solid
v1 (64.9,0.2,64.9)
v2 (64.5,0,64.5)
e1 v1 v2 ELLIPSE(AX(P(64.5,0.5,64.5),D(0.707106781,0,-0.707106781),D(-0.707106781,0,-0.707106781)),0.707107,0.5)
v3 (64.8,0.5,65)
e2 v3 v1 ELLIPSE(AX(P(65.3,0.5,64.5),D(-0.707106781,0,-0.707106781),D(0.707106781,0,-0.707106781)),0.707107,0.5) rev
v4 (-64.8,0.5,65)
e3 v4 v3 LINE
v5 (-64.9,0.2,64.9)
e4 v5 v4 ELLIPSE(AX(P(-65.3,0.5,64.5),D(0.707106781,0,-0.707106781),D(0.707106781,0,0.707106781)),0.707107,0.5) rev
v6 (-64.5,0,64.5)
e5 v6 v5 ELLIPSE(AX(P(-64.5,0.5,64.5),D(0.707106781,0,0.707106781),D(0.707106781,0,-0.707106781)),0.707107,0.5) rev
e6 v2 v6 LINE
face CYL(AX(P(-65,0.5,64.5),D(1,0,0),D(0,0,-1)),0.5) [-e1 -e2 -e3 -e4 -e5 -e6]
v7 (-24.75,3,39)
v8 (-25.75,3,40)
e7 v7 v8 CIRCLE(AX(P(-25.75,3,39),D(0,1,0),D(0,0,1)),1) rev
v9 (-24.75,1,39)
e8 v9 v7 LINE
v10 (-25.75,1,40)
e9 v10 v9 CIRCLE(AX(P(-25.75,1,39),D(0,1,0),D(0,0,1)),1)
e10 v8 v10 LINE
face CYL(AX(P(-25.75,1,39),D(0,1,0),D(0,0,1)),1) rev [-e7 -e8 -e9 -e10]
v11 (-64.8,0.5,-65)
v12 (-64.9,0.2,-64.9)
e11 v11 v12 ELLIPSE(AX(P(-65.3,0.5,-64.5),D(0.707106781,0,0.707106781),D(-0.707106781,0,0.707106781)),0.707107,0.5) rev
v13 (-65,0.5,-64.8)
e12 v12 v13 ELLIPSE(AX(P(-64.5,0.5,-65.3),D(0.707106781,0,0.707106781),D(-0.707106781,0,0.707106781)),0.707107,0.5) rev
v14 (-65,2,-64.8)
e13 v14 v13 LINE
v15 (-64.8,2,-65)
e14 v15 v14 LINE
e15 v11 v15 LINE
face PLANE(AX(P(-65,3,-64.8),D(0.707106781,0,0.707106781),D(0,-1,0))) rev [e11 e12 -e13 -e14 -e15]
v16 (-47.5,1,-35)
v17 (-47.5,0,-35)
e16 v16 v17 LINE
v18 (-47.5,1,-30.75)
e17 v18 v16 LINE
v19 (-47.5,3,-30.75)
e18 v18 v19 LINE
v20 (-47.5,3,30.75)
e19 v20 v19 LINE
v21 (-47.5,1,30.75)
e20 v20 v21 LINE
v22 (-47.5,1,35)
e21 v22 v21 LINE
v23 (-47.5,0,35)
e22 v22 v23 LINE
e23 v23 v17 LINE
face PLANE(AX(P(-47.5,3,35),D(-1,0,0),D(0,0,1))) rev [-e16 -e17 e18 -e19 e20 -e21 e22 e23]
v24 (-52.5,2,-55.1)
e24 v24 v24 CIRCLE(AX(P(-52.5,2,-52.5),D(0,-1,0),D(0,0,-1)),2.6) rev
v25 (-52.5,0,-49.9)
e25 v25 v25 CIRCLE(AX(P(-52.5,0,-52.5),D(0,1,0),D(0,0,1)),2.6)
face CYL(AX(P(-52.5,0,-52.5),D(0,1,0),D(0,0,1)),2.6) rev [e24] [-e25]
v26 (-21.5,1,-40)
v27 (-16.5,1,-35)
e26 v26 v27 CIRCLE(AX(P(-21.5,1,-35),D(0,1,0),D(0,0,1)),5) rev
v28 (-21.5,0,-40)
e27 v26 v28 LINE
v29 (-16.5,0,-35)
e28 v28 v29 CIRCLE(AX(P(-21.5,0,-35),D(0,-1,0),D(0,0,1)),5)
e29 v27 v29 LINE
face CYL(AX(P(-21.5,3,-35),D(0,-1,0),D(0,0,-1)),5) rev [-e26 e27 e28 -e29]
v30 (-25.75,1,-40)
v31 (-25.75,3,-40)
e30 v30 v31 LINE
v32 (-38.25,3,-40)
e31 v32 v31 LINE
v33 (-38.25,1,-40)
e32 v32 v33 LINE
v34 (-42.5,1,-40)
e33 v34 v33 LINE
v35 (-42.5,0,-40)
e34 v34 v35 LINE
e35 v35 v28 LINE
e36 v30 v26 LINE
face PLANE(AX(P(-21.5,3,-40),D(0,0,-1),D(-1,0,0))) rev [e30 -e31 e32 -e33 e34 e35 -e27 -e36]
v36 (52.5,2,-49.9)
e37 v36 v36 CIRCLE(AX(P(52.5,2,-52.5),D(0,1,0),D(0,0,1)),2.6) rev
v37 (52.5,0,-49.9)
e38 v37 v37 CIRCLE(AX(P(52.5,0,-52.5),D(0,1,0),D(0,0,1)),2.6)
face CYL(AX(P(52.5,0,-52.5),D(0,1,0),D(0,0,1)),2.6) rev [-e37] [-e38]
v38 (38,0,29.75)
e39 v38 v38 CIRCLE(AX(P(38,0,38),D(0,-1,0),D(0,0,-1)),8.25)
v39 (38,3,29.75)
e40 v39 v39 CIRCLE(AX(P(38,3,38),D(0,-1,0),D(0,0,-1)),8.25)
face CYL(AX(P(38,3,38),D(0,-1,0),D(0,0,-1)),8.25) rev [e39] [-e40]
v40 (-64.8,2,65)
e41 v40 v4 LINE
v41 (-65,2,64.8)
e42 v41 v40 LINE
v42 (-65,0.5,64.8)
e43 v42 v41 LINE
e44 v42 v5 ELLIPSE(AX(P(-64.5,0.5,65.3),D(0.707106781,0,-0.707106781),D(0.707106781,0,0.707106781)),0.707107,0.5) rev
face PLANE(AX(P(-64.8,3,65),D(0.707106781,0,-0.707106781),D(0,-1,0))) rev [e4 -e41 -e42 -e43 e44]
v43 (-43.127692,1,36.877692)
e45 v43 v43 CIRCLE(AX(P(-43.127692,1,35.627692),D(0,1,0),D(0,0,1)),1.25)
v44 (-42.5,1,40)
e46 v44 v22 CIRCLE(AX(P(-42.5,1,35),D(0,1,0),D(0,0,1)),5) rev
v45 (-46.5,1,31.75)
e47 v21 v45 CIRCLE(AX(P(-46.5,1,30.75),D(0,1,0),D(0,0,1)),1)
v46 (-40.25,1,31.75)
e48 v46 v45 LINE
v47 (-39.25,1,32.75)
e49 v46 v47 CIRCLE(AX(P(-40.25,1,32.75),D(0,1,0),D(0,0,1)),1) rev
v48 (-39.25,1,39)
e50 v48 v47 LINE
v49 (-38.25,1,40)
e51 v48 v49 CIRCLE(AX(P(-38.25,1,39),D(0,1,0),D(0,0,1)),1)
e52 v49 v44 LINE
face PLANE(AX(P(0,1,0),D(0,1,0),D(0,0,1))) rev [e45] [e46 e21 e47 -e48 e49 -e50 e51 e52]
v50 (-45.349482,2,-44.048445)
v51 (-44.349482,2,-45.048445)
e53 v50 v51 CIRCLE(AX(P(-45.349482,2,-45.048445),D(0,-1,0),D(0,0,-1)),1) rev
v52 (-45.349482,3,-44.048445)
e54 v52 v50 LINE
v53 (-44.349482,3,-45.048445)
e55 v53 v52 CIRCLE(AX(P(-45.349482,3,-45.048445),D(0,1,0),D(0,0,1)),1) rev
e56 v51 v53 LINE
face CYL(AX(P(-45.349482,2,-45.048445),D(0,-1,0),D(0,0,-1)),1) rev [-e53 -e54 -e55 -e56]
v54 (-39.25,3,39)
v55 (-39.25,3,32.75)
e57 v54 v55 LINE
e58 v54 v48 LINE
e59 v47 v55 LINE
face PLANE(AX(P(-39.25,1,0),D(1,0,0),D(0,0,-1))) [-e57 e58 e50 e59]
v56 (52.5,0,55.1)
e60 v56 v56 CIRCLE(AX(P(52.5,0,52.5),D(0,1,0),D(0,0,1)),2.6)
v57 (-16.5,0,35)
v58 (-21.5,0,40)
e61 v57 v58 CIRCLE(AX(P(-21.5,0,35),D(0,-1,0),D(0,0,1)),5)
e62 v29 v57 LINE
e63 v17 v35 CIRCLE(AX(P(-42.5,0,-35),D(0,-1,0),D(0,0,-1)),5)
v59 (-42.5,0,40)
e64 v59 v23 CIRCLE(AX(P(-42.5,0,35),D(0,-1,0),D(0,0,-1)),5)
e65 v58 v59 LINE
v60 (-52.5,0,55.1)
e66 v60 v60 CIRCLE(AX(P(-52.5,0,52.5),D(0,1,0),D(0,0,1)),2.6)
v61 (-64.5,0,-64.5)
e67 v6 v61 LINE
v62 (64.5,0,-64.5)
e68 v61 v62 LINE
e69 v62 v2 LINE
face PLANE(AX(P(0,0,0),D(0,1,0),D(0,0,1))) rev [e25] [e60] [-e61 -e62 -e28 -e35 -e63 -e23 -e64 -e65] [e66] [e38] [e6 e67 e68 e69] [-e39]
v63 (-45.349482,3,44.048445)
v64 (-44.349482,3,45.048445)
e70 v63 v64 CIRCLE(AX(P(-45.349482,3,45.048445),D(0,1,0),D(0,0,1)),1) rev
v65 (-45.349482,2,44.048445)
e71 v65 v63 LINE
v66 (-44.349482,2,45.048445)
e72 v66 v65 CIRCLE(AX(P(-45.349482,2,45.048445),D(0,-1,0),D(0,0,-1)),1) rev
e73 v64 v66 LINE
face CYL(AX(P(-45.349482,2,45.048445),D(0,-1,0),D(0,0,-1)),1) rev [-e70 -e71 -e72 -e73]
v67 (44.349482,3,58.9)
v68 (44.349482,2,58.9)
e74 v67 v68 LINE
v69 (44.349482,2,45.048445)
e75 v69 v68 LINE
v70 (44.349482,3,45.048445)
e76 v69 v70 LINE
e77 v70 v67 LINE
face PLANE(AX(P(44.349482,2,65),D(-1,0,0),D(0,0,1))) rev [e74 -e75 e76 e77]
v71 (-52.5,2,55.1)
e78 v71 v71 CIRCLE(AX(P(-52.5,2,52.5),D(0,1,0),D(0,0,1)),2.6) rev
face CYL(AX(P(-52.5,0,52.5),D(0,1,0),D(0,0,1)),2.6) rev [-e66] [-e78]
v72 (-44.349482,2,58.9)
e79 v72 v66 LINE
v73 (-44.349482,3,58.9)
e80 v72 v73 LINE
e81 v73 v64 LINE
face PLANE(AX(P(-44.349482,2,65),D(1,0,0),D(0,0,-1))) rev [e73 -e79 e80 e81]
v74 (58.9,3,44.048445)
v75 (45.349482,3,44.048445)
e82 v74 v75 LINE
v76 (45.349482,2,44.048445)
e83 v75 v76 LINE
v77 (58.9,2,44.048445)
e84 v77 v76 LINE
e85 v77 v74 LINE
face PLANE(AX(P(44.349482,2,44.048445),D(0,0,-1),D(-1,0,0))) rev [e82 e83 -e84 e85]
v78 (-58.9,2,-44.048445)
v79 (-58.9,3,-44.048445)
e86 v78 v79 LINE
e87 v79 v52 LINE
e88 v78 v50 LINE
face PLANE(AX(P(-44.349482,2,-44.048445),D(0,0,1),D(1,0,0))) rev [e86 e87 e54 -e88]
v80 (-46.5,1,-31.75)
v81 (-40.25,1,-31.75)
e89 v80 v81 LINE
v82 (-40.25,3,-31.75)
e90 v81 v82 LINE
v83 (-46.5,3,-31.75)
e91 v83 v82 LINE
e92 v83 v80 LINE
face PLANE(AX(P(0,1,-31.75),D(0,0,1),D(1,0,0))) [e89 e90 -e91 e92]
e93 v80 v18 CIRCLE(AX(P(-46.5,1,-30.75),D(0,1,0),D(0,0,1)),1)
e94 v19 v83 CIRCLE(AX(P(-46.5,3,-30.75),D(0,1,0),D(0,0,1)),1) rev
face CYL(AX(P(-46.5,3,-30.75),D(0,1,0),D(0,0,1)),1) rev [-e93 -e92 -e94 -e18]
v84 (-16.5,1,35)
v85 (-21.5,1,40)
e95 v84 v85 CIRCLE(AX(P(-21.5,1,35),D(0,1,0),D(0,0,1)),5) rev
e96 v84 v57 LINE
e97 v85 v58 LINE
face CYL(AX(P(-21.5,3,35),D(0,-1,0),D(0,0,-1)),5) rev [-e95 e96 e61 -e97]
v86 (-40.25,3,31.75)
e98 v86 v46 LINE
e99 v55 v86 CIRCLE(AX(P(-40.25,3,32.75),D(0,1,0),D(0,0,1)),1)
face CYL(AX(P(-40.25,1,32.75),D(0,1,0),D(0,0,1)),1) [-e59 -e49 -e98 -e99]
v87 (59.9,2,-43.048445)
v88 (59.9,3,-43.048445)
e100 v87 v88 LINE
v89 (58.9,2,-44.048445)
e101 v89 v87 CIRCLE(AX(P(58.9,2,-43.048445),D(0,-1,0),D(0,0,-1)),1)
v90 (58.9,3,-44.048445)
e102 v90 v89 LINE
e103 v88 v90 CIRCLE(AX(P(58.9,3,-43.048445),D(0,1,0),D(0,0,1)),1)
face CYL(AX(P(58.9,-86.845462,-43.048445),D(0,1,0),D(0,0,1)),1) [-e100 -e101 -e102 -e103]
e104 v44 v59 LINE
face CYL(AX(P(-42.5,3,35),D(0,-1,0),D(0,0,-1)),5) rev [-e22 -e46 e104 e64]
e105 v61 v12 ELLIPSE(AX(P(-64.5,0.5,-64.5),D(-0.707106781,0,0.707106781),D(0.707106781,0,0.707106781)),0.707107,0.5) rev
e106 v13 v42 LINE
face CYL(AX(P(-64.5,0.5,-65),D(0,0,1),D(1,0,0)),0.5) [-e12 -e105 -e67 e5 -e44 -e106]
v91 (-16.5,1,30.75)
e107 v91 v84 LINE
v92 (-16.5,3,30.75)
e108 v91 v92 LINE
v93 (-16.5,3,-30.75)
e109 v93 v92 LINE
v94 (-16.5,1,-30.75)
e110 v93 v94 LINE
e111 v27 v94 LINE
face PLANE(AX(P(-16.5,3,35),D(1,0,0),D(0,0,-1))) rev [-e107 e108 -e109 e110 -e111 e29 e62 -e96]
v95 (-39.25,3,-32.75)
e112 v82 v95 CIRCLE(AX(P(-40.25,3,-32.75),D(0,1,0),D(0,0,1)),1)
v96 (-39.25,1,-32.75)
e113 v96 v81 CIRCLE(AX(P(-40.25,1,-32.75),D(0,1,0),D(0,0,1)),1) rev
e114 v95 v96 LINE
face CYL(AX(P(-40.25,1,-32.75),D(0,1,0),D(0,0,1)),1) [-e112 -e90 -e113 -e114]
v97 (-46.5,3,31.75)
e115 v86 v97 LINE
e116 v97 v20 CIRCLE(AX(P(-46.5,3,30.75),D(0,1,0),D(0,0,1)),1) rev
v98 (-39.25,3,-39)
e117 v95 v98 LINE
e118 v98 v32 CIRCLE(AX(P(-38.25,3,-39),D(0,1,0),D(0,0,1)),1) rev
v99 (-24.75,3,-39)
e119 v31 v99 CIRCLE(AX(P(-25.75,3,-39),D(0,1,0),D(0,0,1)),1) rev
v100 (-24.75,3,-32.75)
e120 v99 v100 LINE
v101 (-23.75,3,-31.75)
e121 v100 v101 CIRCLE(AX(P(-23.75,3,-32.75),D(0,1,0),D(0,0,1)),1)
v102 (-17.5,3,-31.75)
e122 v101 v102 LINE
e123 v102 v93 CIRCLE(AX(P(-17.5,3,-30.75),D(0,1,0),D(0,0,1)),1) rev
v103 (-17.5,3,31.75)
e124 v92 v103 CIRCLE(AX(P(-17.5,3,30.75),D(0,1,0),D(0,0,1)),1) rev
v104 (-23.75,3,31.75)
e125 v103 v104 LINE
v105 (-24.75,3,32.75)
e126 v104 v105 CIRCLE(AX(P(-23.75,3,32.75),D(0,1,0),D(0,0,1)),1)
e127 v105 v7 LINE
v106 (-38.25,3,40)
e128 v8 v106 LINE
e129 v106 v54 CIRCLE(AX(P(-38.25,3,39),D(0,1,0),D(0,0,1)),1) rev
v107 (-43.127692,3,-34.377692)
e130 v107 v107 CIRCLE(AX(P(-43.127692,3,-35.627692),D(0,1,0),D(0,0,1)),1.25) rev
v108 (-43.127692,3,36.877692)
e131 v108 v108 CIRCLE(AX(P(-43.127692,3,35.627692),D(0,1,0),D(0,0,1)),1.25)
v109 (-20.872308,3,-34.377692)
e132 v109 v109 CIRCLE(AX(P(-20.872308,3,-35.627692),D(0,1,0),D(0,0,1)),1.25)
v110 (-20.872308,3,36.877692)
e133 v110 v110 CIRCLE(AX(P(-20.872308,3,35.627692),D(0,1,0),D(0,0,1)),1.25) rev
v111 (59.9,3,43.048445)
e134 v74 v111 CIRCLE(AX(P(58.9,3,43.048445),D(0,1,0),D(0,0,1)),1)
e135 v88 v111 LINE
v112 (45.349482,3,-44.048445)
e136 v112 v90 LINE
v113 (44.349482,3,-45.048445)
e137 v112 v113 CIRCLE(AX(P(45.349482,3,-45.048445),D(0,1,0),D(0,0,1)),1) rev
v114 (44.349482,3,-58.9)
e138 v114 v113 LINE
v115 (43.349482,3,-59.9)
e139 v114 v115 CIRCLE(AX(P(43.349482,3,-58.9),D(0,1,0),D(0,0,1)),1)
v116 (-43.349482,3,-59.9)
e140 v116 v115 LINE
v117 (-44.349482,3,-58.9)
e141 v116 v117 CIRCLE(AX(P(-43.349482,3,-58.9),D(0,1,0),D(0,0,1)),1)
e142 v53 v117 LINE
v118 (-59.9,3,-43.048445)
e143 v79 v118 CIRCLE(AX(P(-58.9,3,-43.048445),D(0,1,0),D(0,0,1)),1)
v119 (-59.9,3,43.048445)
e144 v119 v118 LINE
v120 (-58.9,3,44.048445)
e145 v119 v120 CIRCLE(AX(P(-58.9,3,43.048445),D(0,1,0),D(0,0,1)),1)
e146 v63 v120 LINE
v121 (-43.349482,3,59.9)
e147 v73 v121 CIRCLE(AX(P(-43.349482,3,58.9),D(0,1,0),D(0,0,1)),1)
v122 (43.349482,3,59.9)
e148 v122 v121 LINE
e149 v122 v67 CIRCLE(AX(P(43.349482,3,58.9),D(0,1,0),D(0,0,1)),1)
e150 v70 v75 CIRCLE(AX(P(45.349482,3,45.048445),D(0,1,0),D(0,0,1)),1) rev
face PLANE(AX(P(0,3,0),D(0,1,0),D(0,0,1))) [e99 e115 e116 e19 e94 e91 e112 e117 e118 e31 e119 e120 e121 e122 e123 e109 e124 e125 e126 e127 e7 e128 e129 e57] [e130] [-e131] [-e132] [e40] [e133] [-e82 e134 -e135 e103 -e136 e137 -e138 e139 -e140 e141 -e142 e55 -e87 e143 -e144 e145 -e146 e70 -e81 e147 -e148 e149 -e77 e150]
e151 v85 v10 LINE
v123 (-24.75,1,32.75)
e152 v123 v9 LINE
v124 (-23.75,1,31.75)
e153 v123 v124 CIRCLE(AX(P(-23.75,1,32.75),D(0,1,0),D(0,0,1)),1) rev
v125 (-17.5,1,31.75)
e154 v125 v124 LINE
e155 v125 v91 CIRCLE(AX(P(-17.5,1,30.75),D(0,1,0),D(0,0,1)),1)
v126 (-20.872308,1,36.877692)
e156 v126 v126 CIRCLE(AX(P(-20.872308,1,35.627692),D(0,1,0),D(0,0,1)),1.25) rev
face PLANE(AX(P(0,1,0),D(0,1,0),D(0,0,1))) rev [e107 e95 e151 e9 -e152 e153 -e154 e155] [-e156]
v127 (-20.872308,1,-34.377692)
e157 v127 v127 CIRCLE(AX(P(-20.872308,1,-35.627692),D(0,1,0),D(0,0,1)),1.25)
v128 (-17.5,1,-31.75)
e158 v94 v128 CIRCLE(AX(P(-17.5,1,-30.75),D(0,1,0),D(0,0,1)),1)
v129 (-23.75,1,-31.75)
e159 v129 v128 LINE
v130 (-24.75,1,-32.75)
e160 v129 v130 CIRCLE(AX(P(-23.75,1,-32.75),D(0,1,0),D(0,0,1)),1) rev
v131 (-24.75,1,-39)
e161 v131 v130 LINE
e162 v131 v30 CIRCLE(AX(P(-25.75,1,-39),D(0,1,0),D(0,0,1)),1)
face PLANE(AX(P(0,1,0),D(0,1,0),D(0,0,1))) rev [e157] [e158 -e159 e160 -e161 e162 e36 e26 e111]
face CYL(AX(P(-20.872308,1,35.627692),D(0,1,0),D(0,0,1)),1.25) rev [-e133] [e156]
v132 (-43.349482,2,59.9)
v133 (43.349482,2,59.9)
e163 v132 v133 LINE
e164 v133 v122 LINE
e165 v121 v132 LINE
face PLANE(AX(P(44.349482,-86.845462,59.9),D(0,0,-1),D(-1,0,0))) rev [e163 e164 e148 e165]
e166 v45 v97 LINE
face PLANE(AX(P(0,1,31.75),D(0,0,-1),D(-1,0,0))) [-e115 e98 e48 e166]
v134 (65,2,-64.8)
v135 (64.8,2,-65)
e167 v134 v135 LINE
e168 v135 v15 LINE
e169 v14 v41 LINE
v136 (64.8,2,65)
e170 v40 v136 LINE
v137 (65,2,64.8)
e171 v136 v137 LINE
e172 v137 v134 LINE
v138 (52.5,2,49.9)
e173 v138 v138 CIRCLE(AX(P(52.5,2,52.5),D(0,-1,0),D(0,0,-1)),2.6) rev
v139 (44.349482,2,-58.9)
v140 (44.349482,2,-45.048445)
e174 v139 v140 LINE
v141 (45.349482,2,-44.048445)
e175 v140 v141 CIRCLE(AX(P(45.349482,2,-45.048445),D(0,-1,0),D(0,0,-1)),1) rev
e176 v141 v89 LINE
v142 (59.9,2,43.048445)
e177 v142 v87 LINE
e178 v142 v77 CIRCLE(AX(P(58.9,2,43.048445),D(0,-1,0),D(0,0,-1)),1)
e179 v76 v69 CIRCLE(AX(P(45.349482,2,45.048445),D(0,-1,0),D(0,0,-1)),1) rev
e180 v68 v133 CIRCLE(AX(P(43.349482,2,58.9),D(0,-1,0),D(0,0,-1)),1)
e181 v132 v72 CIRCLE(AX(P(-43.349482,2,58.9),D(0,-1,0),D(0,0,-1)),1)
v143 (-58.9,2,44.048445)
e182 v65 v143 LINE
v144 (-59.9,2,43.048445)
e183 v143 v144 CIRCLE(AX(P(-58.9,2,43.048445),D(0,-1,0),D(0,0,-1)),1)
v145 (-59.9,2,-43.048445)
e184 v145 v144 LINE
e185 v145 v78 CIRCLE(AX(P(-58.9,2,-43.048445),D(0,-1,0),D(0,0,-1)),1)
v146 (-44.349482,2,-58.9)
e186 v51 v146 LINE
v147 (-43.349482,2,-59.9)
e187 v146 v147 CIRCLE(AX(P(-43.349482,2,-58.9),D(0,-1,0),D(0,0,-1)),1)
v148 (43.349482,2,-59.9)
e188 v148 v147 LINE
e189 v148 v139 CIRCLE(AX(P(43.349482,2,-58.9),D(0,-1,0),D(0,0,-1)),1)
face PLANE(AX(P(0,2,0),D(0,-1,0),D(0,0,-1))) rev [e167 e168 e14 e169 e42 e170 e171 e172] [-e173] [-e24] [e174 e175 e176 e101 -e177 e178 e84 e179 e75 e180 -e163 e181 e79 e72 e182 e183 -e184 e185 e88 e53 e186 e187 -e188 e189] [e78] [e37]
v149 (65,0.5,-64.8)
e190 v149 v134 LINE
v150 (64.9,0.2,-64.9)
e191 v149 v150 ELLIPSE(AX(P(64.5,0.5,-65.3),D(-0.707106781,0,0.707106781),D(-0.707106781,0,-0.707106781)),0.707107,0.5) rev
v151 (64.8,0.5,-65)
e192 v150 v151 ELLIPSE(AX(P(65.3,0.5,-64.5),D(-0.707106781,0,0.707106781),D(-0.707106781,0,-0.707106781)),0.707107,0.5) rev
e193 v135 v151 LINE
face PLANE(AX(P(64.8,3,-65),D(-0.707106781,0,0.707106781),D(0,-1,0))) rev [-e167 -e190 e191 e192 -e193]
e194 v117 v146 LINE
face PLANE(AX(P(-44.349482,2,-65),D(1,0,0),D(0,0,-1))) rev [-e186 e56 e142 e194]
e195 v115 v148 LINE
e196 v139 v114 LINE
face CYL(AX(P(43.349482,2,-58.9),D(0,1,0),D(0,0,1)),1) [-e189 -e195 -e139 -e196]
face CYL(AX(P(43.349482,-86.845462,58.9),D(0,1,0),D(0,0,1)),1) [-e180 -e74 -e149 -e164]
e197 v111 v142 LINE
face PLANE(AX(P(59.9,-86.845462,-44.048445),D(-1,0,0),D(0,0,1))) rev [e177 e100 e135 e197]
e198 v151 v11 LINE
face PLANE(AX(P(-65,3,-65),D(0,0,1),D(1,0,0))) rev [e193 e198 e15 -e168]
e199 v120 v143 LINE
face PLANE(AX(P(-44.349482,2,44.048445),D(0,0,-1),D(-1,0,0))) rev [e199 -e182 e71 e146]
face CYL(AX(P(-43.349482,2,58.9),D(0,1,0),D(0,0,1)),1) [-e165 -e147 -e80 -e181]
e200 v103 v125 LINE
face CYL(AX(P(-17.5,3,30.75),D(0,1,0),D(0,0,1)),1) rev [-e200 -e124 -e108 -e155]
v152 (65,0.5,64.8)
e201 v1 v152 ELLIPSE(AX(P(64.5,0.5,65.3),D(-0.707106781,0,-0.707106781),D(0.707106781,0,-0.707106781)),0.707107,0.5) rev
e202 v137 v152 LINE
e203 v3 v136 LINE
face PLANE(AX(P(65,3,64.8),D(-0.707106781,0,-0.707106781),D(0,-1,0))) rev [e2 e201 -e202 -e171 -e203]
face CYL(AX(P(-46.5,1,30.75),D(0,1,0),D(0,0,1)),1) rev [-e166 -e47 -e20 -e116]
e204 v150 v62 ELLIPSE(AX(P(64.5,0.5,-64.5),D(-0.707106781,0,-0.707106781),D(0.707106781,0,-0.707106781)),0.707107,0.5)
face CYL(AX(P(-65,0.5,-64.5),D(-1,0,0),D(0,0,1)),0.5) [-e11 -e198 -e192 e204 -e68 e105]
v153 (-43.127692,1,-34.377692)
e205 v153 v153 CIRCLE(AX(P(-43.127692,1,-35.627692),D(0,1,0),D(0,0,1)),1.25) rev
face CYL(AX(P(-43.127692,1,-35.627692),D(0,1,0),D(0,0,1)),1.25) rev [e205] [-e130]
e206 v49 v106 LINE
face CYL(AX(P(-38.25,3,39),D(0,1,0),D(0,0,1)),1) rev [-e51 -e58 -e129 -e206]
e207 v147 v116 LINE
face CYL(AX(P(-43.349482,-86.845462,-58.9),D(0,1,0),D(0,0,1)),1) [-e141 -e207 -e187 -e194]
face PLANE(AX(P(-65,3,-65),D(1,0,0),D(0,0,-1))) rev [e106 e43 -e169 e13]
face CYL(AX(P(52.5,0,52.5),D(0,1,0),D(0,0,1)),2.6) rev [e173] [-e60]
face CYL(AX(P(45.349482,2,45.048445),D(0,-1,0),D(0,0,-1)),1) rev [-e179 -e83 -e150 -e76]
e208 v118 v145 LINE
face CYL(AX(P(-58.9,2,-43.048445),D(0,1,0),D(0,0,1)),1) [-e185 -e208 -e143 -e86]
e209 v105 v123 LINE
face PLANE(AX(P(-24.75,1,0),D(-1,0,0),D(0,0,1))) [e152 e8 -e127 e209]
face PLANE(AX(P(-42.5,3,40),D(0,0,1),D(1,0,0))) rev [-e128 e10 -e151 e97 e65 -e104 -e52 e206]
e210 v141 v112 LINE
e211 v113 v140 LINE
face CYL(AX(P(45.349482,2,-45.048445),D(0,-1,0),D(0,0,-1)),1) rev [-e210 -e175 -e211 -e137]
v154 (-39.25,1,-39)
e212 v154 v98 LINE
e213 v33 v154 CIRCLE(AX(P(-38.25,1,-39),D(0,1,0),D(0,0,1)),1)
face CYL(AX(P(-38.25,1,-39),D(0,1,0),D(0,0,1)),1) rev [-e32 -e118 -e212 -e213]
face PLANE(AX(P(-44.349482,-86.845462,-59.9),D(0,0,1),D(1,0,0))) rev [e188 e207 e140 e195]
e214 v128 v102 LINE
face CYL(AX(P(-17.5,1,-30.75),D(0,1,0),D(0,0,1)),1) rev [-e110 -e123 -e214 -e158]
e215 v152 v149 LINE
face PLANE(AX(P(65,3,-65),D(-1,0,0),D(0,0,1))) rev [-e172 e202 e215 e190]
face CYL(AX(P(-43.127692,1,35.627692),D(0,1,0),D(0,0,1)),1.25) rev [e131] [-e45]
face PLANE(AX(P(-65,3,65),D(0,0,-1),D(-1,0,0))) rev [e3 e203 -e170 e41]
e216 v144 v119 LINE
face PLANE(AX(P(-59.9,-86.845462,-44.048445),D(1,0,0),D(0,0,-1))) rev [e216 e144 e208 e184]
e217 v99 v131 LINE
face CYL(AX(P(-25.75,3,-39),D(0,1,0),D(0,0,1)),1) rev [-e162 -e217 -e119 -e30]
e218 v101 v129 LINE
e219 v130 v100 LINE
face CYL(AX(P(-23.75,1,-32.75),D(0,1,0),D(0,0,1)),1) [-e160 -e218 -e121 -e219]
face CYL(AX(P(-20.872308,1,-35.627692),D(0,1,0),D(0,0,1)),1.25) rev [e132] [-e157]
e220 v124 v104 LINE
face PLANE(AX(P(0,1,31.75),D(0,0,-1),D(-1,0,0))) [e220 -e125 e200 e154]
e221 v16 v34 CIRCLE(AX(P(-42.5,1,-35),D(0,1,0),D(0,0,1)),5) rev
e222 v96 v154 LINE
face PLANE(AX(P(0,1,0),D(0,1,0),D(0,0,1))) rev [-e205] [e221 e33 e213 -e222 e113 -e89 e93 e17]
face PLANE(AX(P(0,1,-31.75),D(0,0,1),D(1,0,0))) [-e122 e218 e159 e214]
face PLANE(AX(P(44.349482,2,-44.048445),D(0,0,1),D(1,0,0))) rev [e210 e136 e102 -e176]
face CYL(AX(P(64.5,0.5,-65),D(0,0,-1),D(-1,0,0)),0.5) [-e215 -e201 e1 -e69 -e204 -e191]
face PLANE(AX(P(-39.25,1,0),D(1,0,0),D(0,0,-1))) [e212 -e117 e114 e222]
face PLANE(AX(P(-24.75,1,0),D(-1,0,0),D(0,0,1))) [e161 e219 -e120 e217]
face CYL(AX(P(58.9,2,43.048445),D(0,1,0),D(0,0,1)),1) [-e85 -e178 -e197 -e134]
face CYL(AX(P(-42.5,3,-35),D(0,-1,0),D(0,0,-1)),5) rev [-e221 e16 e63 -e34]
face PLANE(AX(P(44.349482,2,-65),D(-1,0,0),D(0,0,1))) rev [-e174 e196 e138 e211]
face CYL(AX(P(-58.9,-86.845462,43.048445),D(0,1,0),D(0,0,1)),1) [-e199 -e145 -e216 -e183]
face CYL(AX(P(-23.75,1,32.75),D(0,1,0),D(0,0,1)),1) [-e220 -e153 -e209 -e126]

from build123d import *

# Parameters (mm, degrees)
SKETCH_1_W          = 130
SKETCH_1_H          = 130
EXTRUDE_1_DEPTH     = 3
SKETCH_2_R          = 2.6
CUT_EXTRUDE_1_DEPTH = 92.972822073
SKETCH_4_W          = 20.650518397
SKETCH_4_H          = 20.951555191
CUT_EXTRUDE_2_DEPTH = 1
SKETCH_5_W          = 88.698963206
SKETCH_5_H          = 5.1
SKETCH_5_W_2        = 5.1
SKETCH_5_H_2        = 88.096889618
CUT_EXTRUDE_3_DEPTH = 1
CUT_EXTRUDE_4_DEPTH = 3
EXTRUDE_START       = -2
SKETCH_7_R          = 1.25
EXTRUDE_2_DEPTH     = 2
FILLET_1_R          = 1
SKETCH_15_R         = 8.25
CUT_EXTRUDE_9_DEPTH = 92.972822073
CHAMFER_2_SIZE      = 0.2
FILLET_2_R          = 0.5
FILLET_3_R          = 1
FILLET_4_R          = 1


with BuildPart() as part:
    # 草图1 → 凸台-拉伸1 (new body)
    with BuildSketch(Plane(origin=(0, 0, 0), x_dir=(1, 0, 0), z_dir=(0, 1, 0))):
        Rectangle(SKETCH_1_W, SKETCH_1_H)
    extrude(amount=EXTRUDE_1_DEPTH)

    # 草图2 → 切除-拉伸1 (cut, through all)
    with BuildSketch(Plane(origin=(0, 3, 0), x_dir=(1, 0, 0), z_dir=(0, 1, 0))):
        with Locations(Location((52.5, 52.5, 0), (0, 0, 270))):
            Circle(SKETCH_2_R)
        with Locations(Location((52.5, -52.5, 0), (0, 0, 270))):
            Circle(SKETCH_2_R)
        with Locations(Location((-52.5, -52.5, 0), (0, 0, 270))):
            Circle(SKETCH_2_R)
        with Locations(Location((-52.5, 52.5, 0), (0, 0, 270))):
            Circle(SKETCH_2_R)
    extrude(amount=-CUT_EXTRUDE_1_DEPTH, mode=Mode.SUBTRACT)

    # 草图4 → 切除-拉伸2 (cut)
    with BuildSketch(Plane(origin=(0, 3, 0), x_dir=(1, 0, 0), z_dir=(0, 1, 0))):
        with Locations((54.674740802, 54.524222405)):
            Rectangle(SKETCH_4_W, SKETCH_4_H)
        with Locations((-54.674740802, -54.524222405)):
            Rectangle(SKETCH_4_W, SKETCH_4_H)
        with Locations((54.674740802, -54.524222405)):
            Rectangle(SKETCH_4_W, SKETCH_4_H)
        with Locations((-54.674740802, 54.524222405)):
            Rectangle(SKETCH_4_W, SKETCH_4_H)
    extrude(amount=-CUT_EXTRUDE_2_DEPTH, mode=Mode.SUBTRACT)

    # 草图5 → 切除-拉伸3 (cut)
    with BuildSketch(Plane(origin=(0, 3, 0), x_dir=(1, 0, 0), z_dir=(0, 1, 0))):
        with Locations((0, 62.45)):
            Rectangle(SKETCH_5_W, SKETCH_5_H)
        with Locations((62.45, 0)):
            Rectangle(SKETCH_5_W_2, SKETCH_5_H_2)
        with Locations((0, -62.45)):
            Rectangle(SKETCH_5_W, SKETCH_5_H)
        with Locations((-62.45, 0)):
            Rectangle(SKETCH_5_W_2, SKETCH_5_H_2)
    extrude(amount=-CUT_EXTRUDE_3_DEPTH, mode=Mode.SUBTRACT)

    # 草图6 → 切除-拉伸4 (cut)
    with BuildSketch(Plane(origin=(0, 0, 0), x_dir=(-1, 0, 0), z_dir=(0, -1, 0))):
        with BuildLine():
            Line((47.5, -35), (47.5, 35))
            ThreePointArc((47.5, 35), (46.035533906, 38.535533906), (42.5, 40))
            Line((42.5, 40), (21.5, 40))
            ThreePointArc((21.5, 40), (17.964466094, 38.535533906), (16.5, 35))
            Line((16.5, 35), (16.5, -35))
            ThreePointArc((16.5, -35), (17.964466094, -38.535533906), (21.5, -40))
            Line((21.5, -40), (42.5, -40))
            ThreePointArc((42.5, -40), (46.035533906, -38.535533906), (47.5, -35))
        make_face()
    extrude(amount=-CUT_EXTRUDE_4_DEPTH, mode=Mode.SUBTRACT)

    # 草图7 → 凸台-拉伸2 (add)
    # profile 1 of 4: a face of its own
    with BuildSketch(Plane(origin=(0, 3, 0), x_dir=(1, 0, 0), z_dir=(0, 1, 0)).offset(EXTRUDE_START)):
        with BuildLine():
            Line((-24.75, 40), (-24.75, 31.75))
            Line((-24.75, 31.75), (-16.5, 31.75))
            Line((-16.5, 31.75), (-16.5, 35))
            ThreePointArc((-16.5, 35), (-17.964466094, 38.535533906), (-21.5, 40))
            Line((-21.5, 40), (-24.75, 40))
        make_face()
        with Locations(Location((-20.872307757, 35.627692243, 0), (0, 0, 270))):
            Circle(SKETCH_7_R, mode=Mode.SUBTRACT)
    # profile 2 of 4: a face of its own
    with BuildSketch(Plane(origin=(0, 3, 0), x_dir=(1, 0, 0), z_dir=(0, 1, 0)).offset(EXTRUDE_START)):
        with BuildLine():
            Line((-16.5, -31.75), (-24.75, -31.75))
            Line((-24.75, -31.75), (-24.75, -40))
            Line((-24.75, -40), (-21.5, -40))
            ThreePointArc((-21.5, -40), (-17.964466094, -38.535533906), (-16.5, -35))
            Line((-16.5, -35), (-16.5, -31.75))
        make_face()
        with Locations(Location((-20.872307757, -35.627692243, 0), (0, 0, 270))):
            Circle(SKETCH_7_R, mode=Mode.SUBTRACT)
    # profile 3 of 4: a face of its own
    with BuildSketch(Plane(origin=(0, 3, 0), x_dir=(1, 0, 0), z_dir=(0, 1, 0)).offset(EXTRUDE_START)):
        with BuildLine():
            Line((-39.25, -40), (-39.25, -31.75))
            Line((-39.25, -31.75), (-47.5, -31.75))
            Line((-47.5, -31.75), (-47.5, -35))
            ThreePointArc((-47.5, -35), (-46.035533906, -38.535533906), (-42.5, -40))
            Line((-42.5, -40), (-39.25, -40))
        make_face()
        with Locations(Location((-43.127692243, -35.627692243, 0), (0, 0, 270))):
            Circle(SKETCH_7_R, mode=Mode.SUBTRACT)
    # profile 4 of 4: a face of its own
    with BuildSketch(Plane(origin=(0, 3, 0), x_dir=(1, 0, 0), z_dir=(0, 1, 0)).offset(EXTRUDE_START)):
        with BuildLine():
            Line((-47.5, 31.75), (-39.25, 31.75))
            Line((-39.25, 31.75), (-39.25, 40))
            Line((-39.25, 40), (-42.5, 40))
            ThreePointArc((-42.5, 40), (-46.035533906, 38.535533906), (-47.5, 35))
            Line((-47.5, 35), (-47.5, 31.75))
        make_face()
        with Locations(Location((-43.127692243, 35.627692243, 0), (0, 0, 270))):
            Circle(SKETCH_7_R, mode=Mode.SUBTRACT)
    extrude(amount=EXTRUDE_2_DEPTH)

    # 圆角1
    fillet_1_edges = [part.edges().sort_by_distance(p)[0] for p in [
        (-24.75, 2, -31.75),
        (-39.25, 2, -31.75),
        (-39.25, 2, 31.75),
        (-24.75, 2, 31.75),
    ]]
    fillet(fillet_1_edges, radius=FILLET_1_R)

    # 草图15 → 切除-拉伸9 (cut, through all)
    with BuildSketch(Plane(origin=(0, 0, 0), x_dir=(-1, 0, 0), z_dir=(0, -1, 0))):
        with Locations(Location((-38, -38, 0), (0, 0, 90))):
            Circle(SKETCH_15_R)
    extrude(amount=-CUT_EXTRUDE_9_DEPTH, mode=Mode.SUBTRACT)

    # 倒角2
    chamfer_2_edges = [part.edges().sort_by_distance(p)[0] for p in [
        (65, 1, 65),
        (-65, 1, 65),
        (-65, 1, -65),
        (65, 1, -65),
    ]]
    chamfer(chamfer_2_edges, length=CHAMFER_2_SIZE)

    # 圆角2
    # the kernel refuses this fillet: 0.5 mm, written as the material it takes off along each edge
    with BuildSketch(Plane(origin=(-66.05, 0, -65), x_dir=(0, 0, 1), z_dir=(1, 0, 0)), Plane(origin=(-65, 0, 66.05), x_dir=(1, 0, 0), z_dir=(0, 0, -1)), Plane(origin=(66.05, 0, 65), x_dir=(0, 0, -1), z_dir=(-1, 0, 0)), Plane(origin=(65, 0, -66.05), x_dir=(-1, 0, 0), z_dir=(0, 0, 1))) as fillet_2_piece_1:
        with BuildLine():
            CenterArc((FILLET_2_R, -FILLET_2_R), FILLET_2_R, 90, 90)
            Line((0, -FILLET_2_R), (0, 0))
            Line((0, 0), (FILLET_2_R, 0))
        make_face()
    extrude(amount=132.1, mode=Mode.SUBTRACT)

    # 圆角3
    fillet_3_edges = [part.edges().sort_by_distance(p)[0] for p in [
        (59.9, 2.5, 44.048444809),
        (59.9, 2.5, -44.048444809),
        (-44.349481603, 2.5, -59.9),
        (44.349481603, 2.5, -59.9),
        (44.349481603, 2.5, 59.9),
        (-44.349481603, 2.5, 59.9),
        (-59.9, 2.5, 44.048444809),
        (-59.9, 2.5, -44.048444809),
        (-44.349481603, 2.5, -44.048444809),
        (-44.349481603, 2.5, 44.048444809),
        (44.349481603, 2.5, 44.048444809),
        (44.349481603, 2.5, -44.048444809),
    ]]
    fillet(fillet_3_edges, radius=FILLET_3_R)

    # 圆角4
    fillet_4_edges = [part.edges().sort_by_distance(p)[0] for p in [
        (-24.75, 2, -40),
        (-16.5, 2, -31.75),
        (-47.5, 2, -31.75),
        (-39.25, 2, -40),
        (-39.25, 2, 40),
        (-47.5, 2, 31.75),
        (-16.5, 2, 31.75),
        (-24.75, 2, 40),
    ]]
    fillet(fillet_4_edges, radius=FILLET_4_R)


solid = part.part
